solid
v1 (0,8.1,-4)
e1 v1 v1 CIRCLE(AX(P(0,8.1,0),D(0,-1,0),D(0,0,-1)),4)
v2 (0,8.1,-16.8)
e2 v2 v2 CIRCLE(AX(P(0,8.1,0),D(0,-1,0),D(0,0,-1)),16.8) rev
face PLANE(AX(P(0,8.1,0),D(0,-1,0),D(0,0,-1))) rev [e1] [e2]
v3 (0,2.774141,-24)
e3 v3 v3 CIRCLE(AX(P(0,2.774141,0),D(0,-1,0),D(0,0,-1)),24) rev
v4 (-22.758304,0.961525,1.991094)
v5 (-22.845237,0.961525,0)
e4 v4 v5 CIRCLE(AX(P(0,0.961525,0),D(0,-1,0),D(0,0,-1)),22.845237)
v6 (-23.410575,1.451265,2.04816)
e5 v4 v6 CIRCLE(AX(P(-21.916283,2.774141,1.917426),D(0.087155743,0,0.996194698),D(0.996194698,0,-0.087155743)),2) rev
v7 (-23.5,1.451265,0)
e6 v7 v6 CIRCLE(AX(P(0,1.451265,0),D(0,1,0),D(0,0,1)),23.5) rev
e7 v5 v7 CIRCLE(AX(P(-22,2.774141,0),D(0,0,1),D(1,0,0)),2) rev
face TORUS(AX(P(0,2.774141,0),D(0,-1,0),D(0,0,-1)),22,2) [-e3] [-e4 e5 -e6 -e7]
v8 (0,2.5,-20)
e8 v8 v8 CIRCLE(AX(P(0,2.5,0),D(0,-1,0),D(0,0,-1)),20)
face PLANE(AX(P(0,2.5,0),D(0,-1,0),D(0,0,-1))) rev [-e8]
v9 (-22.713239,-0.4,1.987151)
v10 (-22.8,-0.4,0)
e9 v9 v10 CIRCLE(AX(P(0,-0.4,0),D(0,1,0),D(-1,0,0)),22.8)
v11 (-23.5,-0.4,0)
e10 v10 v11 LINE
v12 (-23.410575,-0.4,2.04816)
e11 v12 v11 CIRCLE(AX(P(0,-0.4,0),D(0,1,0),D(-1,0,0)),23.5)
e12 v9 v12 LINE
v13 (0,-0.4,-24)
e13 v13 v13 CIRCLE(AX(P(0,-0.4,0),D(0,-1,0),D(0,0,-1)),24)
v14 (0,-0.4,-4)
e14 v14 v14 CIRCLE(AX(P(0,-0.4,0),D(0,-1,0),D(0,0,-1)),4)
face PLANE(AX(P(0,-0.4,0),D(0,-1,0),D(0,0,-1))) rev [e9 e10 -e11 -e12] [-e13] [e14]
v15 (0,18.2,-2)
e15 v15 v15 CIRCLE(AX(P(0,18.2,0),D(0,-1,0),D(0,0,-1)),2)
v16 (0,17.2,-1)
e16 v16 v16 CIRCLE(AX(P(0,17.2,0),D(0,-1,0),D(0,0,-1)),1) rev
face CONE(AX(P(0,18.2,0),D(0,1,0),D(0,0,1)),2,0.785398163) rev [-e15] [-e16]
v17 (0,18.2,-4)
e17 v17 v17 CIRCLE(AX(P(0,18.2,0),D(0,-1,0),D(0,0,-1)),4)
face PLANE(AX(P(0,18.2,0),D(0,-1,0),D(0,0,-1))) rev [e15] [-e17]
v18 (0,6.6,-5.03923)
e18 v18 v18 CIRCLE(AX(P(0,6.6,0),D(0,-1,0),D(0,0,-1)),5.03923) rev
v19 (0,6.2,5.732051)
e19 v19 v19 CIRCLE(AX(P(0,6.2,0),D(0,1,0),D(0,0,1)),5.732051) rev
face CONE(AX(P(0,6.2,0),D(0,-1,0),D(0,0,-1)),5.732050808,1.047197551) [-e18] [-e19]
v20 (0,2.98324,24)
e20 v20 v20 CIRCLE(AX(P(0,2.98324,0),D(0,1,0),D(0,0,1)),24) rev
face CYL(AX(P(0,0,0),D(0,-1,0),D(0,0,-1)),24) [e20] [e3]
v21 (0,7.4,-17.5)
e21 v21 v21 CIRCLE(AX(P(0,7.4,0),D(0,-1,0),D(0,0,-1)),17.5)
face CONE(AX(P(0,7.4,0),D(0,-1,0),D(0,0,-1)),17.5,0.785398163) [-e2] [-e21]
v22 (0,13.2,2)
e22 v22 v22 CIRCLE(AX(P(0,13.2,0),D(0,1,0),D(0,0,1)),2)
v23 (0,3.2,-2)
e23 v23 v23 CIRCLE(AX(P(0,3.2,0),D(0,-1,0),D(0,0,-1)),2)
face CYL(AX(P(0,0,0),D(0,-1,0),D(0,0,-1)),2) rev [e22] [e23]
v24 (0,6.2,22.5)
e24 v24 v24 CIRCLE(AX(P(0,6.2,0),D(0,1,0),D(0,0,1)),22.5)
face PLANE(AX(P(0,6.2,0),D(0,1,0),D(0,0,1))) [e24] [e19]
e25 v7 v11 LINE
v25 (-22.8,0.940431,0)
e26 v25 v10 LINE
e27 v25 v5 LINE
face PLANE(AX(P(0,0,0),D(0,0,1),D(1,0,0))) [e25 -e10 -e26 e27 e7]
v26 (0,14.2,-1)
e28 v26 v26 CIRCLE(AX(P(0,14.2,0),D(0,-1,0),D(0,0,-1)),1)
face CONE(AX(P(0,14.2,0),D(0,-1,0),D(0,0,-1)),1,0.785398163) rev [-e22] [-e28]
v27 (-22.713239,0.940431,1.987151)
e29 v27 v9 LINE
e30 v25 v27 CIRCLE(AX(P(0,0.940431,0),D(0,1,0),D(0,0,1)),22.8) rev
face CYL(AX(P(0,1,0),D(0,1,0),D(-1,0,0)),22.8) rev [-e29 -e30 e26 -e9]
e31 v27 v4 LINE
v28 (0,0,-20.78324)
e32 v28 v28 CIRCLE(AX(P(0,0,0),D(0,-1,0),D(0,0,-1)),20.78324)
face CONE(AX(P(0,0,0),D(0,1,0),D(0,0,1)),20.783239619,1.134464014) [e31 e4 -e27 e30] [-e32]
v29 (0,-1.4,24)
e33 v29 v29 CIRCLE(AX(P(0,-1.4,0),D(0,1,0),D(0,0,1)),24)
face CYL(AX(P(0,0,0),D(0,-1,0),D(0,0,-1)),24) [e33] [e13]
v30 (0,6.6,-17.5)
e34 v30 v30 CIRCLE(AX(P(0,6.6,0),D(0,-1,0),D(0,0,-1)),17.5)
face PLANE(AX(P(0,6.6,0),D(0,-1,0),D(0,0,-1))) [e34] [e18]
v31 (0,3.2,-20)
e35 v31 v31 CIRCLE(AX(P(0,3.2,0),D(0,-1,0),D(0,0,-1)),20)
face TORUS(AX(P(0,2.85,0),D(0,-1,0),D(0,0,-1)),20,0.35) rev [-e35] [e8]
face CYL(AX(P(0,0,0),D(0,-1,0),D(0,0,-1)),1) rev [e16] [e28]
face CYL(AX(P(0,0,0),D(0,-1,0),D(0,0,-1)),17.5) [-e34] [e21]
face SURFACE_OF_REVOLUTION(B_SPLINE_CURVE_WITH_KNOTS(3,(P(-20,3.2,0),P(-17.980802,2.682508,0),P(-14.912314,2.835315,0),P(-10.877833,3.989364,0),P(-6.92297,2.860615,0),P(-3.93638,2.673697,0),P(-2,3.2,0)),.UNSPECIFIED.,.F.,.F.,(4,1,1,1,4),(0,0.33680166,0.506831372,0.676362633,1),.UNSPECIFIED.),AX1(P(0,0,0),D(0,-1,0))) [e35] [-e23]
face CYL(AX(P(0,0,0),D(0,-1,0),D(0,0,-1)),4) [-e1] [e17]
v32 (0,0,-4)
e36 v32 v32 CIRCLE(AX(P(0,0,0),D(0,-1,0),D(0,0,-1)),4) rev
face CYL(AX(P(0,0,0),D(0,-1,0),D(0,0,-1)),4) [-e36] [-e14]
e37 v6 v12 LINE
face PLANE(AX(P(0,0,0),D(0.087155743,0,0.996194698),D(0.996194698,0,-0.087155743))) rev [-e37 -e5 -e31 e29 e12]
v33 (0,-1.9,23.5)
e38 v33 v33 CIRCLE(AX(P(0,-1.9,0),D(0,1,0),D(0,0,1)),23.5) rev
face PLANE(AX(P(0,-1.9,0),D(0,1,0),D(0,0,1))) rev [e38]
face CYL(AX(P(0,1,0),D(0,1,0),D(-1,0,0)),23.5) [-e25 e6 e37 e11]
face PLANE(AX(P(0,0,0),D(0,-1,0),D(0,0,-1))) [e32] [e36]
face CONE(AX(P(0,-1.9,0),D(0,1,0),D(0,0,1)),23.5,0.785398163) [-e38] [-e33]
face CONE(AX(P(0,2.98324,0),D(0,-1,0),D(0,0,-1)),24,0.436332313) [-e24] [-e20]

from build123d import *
from OCP.BRepFilletAPI import BRepFilletAPI_MakeChamfer

# Parameters (mm, degrees)
SKETCH1_W       = 20
SKETCH1_H       = 2.5
SKETCH1_W_2     = 13.5
SKETCH1_H_2     = 1.5
SKETCH1_W_3     = 1
SKETCH1_H_3     = 4
CHAMFER1_SIZE   = 1.5
CHAMFER1_SIZE2  = 3.216760381
CHAMFER2_SIZE   = 1.732050808
CHAMFER2_SIZE_2 = 1
FILLET6_R       = 2
CHAMFER3_SIZE   = 1
CHAMFER4_SIZE   = 0.7
SKETCH3_W       = 2
SKETCH3_H       = 1.4
SKETCH3_3_W     = 2
SKETCH3_3_H     = 1.4
SKETCH3_3_W_2   = 0.7
SKETCH3_3_H_2   = 2
REVOLVE3_ANGLE  = 355
CHAMFER5_SIZE   = 0.5


# Some blends are built 0.0001 mm under size
with BuildPart() as part:
    # Sketch1 → Revolve1 (revolve)
    with BuildSketch(Plane.XY, mode=Mode.PRIVATE) as revolve1_sk:
        with BuildLine():
            ThreePointArc((-20, 2.5), (-20.35, 2.85), (-20, 3.2))
            Line((-20, 3.2), (-20, 6.2))
            Line((-20, 6.2), (-24, 6.2))
            Line((-24, 6.2), (-24, 0))
            Line((-24, 0), (-20, 0))
            Line((-20, 0), (-20, 2.5))
        make_face()
        with BuildLine():
            Line((-20, 6.2), (-20, 3.2))
            add(Edge.make_bspline(
                [(-20, 3.2), (-17.980801876, 2.682507767), (-14.91231446, 2.835315185), (-10.877832782, 3.989364254), (-6.922969843, 2.860615153), (-3.936379553, 2.67369733), (-2, 3.2)],
                knots=[0, 0, 0, 0, 0.33680166, 0.506831372, 0.676362633, 1, 1, 1, 1], degree=3))
            Line((-2, 3.2), (-2, 6.2))
            Line((-2, 6.2), (-4, 6.2))
            Line((-4, 6.2), (-20, 6.2))
        make_face()
        with Locations((-10, 1.25)):
            Rectangle(SKETCH1_W, SKETCH1_H)
        Polygon((-4, 6.6), (-4, 6.2), (-2, 6.2), (-2, 14.2), (-2, 18.2), (-4, 18.2), (-4, 8.1), align=None)
        with Locations((-10.75, 7.35)):
            Rectangle(SKETCH1_W_2, SKETCH1_H_2)
        with Locations((-1.5, 16.2)):
            Rectangle(SKETCH1_W_3, SKETCH1_H_3)
    revolve(revolve1_sk.sketch.rotate(Axis((0, 0, 0), (0, 1, 0)), 270), axis=Axis((0, 0, 0), (0, 1, 0)))

    # Chamfer1: one chamfer whose edges measure the first distance from different faces: ONE call of the kernel's chamfer builder (chamfer() names one face for all edges)
    chamfer1_edges_1 = [part.edges().sort_by_distance(p)[0] for p in [
        (0, 0, 24),
    ]]
    chamfer1_side_1 = [part.faces().sort_by_distance(p)[0] for p in [
        (0, 3.1, 24),
    ]]
    chamfer1_edges_2 = [part.edges().sort_by_distance(p)[0] for p in [
        (0, 6.2, 24),
    ]]
    chamfer1_side_2 = [part.faces().sort_by_distance(p)[0] for p in [
        (0, 6.2, 23.32117749),
    ]]
    chamfer1 = BRepFilletAPI_MakeChamfer(part.part.solid().wrapped)
    for e in chamfer1_edges_1:
        chamfer1.Add(CHAMFER1_SIZE, CHAMFER1_SIZE2, e.wrapped, chamfer1_side_1[0].wrapped)  # the first distance lies on this face
    for e in chamfer1_edges_2:
        chamfer1.Add(CHAMFER1_SIZE, CHAMFER1_SIZE2, e.wrapped, chamfer1_side_2[0].wrapped)  # the first distance lies on this face
    add(Compound.cast(chamfer1.Shape()), mode=Mode.REPLACE)

    # Chamfer2
    # the kernel refuses this chamfer: 1.732050808, 1 mm, written as the material it adds along each edge
    with BuildSketch(Plane(origin=(0, 6.2, 0), x_dir=(0, 0, -1), z_dir=(1, 0, 0))) as chamfer2_piece_1:
        Polygon((4 + CHAMFER2_SIZE, 0), (4, CHAMFER2_SIZE_2), (4, 0), align=None)
    revolve(axis=Axis((0, 6.2, 0), (0, 1, 0)))

    # Fillet6
    fillet6_edges = [part.edges().sort_by_distance(p)[0] for p in [
        (0, 1.5, 24),
    ]]
    fillet(fillet6_edges, radius=FILLET6_R)

    # Chamfer3
    chamfer3_edges = [part.edges().sort_by_distance(p)[0] for p in [
        (0, 18.2, 1),
        (0, 14.2, 2),
    ]]
    chamfer(chamfer3_edges, length=CHAMFER3_SIZE - 0.0001)  # a hair under: the kernel refuses the full size

    # Chamfer4
    chamfer4_edges = [part.edges().sort_by_distance(p)[0] for p in [
        (0, 8.1, 17.5),
    ]]
    chamfer(chamfer4_edges, length=CHAMFER4_SIZE)

    # Sketch3 → Revolve2 (revolve)
    with BuildSketch(Plane.XY, mode=Mode.PRIVATE) as revolve2_sk:
        Polygon((0, 1), (0, -1.9), (-2, -1.9), (-2, -0.4), (-2, 1), align=None)
        with Locations((-3, 0.3)):
            Rectangle(SKETCH3_W, SKETCH3_H)
        Polygon((-2, -1.9), (-2, -0.4), (-4, -0.4), (-22.8, -0.4), (-23.5, -0.4), (-24, -0.4), (-24, -1.9), align=None)
    revolve(revolve2_sk.sketch.rotate(Axis((0, 0, 0), (0, 1, 0)), 270), axis=Axis((0, 0, 0), (0, 1, 0)))

    # Sketch3<3> → Revolve3 (revolve)
    with BuildSketch(Plane.XY):
        with Locations((-3, 0.3)):
            Rectangle(SKETCH3_3_W, SKETCH3_3_H)
        Polygon((0, 1), (-2, 1), (-2, -0.4), (-2, -1.9), (0, -1.9), align=None)
        Polygon((-2, -1.9), (-2, -0.4), (-4, -0.4), (-22.8, -0.4), (-23.5, -0.4), (-24, -0.4), (-24, -1.9), align=None)
        with Locations((-23.15, 0.6)):
            Rectangle(SKETCH3_3_W_2, SKETCH3_3_H_2)
    revolve(axis=Axis((0, 1, 0), (0, -1, 0)), revolution_arc=REVOLVE3_ANGLE)

    # Chamfer5
    chamfer5_edges = [part.edges().sort_by_distance(p)[0] for p in [
        (0, -1.9, 24),
    ]]
    chamfer(chamfer5_edges, length=CHAMFER5_SIZE)


solid = part.part
